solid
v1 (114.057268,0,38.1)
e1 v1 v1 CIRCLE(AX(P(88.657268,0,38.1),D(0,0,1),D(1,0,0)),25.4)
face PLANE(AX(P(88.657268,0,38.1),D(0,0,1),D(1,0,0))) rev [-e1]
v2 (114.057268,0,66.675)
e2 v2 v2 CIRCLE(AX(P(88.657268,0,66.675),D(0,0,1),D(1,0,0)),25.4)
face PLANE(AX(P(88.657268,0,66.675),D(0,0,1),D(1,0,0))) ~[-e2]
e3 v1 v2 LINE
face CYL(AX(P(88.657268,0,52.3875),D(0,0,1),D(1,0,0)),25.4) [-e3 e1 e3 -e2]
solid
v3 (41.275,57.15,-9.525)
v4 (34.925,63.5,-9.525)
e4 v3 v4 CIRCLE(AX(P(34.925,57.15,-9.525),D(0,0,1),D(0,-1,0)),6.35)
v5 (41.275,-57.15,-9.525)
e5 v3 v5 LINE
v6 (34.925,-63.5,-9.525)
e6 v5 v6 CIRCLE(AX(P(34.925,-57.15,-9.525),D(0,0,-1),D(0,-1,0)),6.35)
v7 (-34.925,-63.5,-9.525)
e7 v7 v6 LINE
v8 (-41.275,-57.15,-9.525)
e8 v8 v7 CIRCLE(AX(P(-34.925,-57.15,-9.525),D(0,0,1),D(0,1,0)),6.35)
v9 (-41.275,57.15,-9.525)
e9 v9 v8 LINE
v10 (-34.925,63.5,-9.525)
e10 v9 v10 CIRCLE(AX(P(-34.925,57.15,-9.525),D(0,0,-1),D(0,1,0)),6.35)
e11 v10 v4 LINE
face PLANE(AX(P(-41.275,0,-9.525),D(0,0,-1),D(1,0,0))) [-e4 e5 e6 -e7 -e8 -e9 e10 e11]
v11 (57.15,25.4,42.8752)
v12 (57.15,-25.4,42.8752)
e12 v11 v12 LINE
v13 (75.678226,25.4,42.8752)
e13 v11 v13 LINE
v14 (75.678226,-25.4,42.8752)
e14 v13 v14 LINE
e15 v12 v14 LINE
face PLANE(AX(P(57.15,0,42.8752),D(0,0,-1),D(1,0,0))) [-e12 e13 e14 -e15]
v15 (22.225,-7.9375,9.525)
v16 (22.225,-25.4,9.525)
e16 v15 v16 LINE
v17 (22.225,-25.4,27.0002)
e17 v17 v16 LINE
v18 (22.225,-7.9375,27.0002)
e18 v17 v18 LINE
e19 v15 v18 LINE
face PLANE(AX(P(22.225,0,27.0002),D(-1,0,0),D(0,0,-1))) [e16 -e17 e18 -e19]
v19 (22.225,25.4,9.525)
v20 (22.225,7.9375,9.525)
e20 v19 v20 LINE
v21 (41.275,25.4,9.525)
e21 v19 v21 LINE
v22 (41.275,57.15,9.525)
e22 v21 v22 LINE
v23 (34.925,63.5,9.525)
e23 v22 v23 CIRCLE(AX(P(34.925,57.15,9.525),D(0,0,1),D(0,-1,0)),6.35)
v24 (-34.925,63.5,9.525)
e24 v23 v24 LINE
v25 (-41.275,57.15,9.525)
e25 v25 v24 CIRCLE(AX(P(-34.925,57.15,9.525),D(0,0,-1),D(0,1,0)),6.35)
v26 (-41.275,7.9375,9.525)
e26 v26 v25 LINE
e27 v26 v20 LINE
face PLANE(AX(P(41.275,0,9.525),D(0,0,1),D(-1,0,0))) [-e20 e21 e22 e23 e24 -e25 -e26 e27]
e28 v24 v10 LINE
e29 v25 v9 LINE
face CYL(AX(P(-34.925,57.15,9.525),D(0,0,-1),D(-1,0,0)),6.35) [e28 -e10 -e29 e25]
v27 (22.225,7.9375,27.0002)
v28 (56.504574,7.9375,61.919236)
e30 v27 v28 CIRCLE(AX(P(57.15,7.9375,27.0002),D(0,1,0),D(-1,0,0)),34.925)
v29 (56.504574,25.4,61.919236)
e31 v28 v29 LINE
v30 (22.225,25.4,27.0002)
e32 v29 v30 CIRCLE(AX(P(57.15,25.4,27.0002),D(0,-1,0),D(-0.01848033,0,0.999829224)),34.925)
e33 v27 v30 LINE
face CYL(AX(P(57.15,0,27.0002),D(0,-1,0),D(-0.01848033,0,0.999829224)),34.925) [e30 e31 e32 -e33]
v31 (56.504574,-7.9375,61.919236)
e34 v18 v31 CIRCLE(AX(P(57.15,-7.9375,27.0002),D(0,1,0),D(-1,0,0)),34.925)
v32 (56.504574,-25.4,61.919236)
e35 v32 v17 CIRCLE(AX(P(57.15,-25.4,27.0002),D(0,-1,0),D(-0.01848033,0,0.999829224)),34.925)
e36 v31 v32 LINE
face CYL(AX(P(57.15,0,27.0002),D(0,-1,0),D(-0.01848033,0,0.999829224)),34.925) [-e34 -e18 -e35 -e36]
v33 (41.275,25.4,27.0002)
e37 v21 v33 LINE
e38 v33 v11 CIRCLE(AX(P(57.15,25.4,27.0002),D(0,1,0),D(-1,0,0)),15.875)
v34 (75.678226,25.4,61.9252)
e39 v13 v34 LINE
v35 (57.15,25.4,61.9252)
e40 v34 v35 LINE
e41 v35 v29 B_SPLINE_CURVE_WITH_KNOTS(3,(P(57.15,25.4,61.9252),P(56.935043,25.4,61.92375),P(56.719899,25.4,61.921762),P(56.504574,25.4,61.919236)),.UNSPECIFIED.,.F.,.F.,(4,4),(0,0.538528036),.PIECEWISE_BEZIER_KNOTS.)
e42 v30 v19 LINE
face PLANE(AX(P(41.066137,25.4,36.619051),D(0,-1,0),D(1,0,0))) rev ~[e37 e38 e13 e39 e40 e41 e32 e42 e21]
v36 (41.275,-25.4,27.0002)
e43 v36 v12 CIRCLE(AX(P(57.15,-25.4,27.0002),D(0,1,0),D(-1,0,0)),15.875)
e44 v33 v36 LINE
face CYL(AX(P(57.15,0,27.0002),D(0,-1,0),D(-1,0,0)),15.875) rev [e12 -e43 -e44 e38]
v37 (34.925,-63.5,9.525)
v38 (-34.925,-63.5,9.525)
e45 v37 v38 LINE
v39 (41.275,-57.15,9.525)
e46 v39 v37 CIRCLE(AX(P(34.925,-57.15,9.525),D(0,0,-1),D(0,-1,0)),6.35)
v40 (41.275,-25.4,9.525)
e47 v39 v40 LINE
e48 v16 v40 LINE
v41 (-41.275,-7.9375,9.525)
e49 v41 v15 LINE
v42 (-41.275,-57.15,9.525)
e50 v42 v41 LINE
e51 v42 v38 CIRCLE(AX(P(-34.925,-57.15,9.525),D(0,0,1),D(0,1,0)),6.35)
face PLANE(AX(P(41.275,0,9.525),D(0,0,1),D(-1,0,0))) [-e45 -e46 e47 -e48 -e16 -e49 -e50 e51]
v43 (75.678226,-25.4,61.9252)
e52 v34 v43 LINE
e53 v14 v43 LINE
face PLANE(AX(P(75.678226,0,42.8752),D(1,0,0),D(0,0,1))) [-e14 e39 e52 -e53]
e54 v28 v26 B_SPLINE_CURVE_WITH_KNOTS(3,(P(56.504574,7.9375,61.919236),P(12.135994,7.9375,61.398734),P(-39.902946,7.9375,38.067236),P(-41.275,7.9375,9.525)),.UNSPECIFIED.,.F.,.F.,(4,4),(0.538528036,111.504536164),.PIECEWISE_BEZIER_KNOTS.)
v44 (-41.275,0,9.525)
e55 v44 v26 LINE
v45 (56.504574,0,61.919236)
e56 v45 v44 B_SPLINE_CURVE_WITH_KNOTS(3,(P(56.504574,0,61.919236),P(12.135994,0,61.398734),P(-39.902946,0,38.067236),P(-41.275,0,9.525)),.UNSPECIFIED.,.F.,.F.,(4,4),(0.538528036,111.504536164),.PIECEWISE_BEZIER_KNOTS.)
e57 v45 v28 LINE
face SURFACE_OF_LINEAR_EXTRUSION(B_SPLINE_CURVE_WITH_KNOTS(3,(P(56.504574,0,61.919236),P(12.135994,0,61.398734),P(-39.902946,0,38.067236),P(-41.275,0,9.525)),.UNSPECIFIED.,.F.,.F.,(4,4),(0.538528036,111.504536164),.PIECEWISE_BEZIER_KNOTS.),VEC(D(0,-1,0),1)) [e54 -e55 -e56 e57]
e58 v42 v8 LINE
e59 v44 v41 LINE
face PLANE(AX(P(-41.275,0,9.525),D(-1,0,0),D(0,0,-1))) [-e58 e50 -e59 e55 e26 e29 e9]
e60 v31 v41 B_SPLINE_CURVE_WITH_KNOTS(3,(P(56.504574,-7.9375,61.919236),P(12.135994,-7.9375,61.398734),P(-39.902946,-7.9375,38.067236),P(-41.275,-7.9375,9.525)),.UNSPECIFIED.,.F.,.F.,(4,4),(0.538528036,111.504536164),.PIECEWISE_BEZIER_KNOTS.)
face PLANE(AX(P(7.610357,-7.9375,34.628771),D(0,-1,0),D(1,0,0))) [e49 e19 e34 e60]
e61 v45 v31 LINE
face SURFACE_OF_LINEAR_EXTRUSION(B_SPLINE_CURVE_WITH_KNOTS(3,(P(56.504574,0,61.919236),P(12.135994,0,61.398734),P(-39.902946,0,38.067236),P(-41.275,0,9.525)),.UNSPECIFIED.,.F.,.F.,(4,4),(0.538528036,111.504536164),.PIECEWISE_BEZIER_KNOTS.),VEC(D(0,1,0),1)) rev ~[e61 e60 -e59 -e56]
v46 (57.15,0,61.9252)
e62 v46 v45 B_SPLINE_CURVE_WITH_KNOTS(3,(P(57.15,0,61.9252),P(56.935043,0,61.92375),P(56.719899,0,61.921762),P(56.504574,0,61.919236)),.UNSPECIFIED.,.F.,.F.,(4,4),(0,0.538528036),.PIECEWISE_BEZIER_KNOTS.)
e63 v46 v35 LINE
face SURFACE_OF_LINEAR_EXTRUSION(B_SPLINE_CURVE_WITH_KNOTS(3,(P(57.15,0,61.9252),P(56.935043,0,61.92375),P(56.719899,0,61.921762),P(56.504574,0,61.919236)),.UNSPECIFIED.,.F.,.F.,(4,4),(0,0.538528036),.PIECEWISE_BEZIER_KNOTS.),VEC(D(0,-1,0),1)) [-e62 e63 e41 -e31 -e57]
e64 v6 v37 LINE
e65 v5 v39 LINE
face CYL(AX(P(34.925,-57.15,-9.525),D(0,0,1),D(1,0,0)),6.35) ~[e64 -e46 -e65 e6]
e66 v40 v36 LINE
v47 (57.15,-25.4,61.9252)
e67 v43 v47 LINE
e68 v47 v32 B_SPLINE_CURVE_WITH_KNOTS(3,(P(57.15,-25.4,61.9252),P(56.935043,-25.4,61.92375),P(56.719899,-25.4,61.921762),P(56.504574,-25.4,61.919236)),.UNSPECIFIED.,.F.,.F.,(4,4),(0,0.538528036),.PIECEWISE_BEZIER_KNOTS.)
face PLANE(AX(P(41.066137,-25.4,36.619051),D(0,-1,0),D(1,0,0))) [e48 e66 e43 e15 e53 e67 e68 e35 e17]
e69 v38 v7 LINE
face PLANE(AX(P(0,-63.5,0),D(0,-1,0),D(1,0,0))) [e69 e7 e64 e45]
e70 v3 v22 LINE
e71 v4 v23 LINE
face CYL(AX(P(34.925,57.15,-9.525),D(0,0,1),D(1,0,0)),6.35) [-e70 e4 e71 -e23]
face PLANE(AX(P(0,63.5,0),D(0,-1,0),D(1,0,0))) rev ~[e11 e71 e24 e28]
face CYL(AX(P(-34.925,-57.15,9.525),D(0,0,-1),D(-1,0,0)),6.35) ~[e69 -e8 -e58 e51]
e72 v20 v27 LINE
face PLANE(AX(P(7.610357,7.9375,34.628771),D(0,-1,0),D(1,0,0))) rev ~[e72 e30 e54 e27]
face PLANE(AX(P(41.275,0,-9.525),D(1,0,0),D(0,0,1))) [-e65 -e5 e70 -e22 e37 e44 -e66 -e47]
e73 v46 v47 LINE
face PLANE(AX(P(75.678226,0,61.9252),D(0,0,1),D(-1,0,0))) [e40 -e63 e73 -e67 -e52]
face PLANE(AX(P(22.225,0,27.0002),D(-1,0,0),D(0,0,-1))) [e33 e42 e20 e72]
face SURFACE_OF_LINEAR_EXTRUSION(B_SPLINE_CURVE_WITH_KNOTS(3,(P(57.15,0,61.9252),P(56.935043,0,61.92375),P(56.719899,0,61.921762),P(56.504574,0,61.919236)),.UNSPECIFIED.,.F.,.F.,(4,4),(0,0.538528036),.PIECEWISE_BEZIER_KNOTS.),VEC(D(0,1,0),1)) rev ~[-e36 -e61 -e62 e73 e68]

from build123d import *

# Parameters (mm, degrees)
F1_DEPTH = 63.5
F2_R     = 6.35
F0_W     = 25.4
F0_H     = 28.575
F4_DEPTH = 7.9375
F0_W_2   = 12.4209585713
F0_H_2   = 19.05
F5_DEPTH = 25.4


with BuildPart() as f1:
    # F0 (on Front) → F1 (new body, symmetric)
    with BuildSketch(Plane.XZ):
        Polygon((22.225, 9.525), (-41.275, 9.525), (-41.275, -9.525), (41.275, -9.525), (41.275, 9.525), align=None)
    extrude(amount=F1_DEPTH, both=True)

    # F2
    f2_edges = [f1.edges().sort_by_distance(p)[0] for p in [
        (41.275, -63.5, 0),
        (-41.275, -63.5, 0),
        (-41.275, 63.5, 0),
        (41.275, 63.5, 0),
    ]]
    fillet(f2_edges, radius=F2_R)

    # F0 (on Front) → F4 (join, symmetric)
    with BuildSketch(Plane.XZ):
        with BuildLine():
            add(Edge.make_bspline(
                [(56.5045744803, 61.9192356525), (12.1359940595, 61.3987338725), (-39.902945727, 38.0672359689), (-41.275, 9.525)],
                knots=[0.538528036, 0.538528036, 0.538528036, 0.538528036, 111.5045361635, 111.5045361635, 111.5045361635, 111.5045361635], degree=3))
            Line((-41.275, 9.525), (22.225, 9.525))
            Line((22.225, 9.525), (22.225, 27.0002))
            ThreePointArc((22.225, 27.0002), (32.2271479233, 51.4666478289), (56.5045744803, 61.9192356525))
        make_face()
    extrude(amount=F4_DEPTH, both=True)

    # F0 (on Front) → F5 (join, symmetric)
    with BuildSketch(Plane.XZ):
        with BuildLine():
            Line((22.225, 27.0002), (22.225, 9.525))
            Line((22.225, 9.525), (41.275, 9.525))
            Line((41.275, 9.525), (41.275, 27.0002))
            ThreePointArc((41.275, 27.0002), (45.9246798487, 38.2255201513), (57.15, 42.8752))
            Line((57.15, 42.8752), (63.257267818, 42.8752))
            Line((63.257267818, 42.8752), (63.257267818, 61.9252))
            Line((63.257267818, 61.9252), (57.15, 61.9252))
            add(Edge.make_bspline(
                [(57.15, 61.9252), (56.9350432615, 61.9237504809), (56.7198991989, 61.9217616945), (56.5045744803, 61.9192356525)],
                knots=[0, 0, 0, 0, 0.538528036, 0.538528036, 0.538528036, 0.538528036], degree=3))
            ThreePointArc((56.5045744803, 61.9192356525), (32.2271479233, 51.4666478289), (22.225, 27.0002))
        make_face()
        with Locations((69.4677471036, 52.4002)):
            Rectangle(F0_W_2, F0_H_2)
    extrude(amount=F5_DEPTH, both=True)


with BuildPart() as f3:
    # F0 (on Front) → F3 (revolve)
    with BuildSketch(Plane.XZ):
        with Locations((101.357267818, 52.3875)):
            Rectangle(F0_W, F0_H)
    revolve(axis=Axis((88.657267818, 0, 52.3875), (0, 0, 1)))


solid = Compound([f1.part, f3.part])
